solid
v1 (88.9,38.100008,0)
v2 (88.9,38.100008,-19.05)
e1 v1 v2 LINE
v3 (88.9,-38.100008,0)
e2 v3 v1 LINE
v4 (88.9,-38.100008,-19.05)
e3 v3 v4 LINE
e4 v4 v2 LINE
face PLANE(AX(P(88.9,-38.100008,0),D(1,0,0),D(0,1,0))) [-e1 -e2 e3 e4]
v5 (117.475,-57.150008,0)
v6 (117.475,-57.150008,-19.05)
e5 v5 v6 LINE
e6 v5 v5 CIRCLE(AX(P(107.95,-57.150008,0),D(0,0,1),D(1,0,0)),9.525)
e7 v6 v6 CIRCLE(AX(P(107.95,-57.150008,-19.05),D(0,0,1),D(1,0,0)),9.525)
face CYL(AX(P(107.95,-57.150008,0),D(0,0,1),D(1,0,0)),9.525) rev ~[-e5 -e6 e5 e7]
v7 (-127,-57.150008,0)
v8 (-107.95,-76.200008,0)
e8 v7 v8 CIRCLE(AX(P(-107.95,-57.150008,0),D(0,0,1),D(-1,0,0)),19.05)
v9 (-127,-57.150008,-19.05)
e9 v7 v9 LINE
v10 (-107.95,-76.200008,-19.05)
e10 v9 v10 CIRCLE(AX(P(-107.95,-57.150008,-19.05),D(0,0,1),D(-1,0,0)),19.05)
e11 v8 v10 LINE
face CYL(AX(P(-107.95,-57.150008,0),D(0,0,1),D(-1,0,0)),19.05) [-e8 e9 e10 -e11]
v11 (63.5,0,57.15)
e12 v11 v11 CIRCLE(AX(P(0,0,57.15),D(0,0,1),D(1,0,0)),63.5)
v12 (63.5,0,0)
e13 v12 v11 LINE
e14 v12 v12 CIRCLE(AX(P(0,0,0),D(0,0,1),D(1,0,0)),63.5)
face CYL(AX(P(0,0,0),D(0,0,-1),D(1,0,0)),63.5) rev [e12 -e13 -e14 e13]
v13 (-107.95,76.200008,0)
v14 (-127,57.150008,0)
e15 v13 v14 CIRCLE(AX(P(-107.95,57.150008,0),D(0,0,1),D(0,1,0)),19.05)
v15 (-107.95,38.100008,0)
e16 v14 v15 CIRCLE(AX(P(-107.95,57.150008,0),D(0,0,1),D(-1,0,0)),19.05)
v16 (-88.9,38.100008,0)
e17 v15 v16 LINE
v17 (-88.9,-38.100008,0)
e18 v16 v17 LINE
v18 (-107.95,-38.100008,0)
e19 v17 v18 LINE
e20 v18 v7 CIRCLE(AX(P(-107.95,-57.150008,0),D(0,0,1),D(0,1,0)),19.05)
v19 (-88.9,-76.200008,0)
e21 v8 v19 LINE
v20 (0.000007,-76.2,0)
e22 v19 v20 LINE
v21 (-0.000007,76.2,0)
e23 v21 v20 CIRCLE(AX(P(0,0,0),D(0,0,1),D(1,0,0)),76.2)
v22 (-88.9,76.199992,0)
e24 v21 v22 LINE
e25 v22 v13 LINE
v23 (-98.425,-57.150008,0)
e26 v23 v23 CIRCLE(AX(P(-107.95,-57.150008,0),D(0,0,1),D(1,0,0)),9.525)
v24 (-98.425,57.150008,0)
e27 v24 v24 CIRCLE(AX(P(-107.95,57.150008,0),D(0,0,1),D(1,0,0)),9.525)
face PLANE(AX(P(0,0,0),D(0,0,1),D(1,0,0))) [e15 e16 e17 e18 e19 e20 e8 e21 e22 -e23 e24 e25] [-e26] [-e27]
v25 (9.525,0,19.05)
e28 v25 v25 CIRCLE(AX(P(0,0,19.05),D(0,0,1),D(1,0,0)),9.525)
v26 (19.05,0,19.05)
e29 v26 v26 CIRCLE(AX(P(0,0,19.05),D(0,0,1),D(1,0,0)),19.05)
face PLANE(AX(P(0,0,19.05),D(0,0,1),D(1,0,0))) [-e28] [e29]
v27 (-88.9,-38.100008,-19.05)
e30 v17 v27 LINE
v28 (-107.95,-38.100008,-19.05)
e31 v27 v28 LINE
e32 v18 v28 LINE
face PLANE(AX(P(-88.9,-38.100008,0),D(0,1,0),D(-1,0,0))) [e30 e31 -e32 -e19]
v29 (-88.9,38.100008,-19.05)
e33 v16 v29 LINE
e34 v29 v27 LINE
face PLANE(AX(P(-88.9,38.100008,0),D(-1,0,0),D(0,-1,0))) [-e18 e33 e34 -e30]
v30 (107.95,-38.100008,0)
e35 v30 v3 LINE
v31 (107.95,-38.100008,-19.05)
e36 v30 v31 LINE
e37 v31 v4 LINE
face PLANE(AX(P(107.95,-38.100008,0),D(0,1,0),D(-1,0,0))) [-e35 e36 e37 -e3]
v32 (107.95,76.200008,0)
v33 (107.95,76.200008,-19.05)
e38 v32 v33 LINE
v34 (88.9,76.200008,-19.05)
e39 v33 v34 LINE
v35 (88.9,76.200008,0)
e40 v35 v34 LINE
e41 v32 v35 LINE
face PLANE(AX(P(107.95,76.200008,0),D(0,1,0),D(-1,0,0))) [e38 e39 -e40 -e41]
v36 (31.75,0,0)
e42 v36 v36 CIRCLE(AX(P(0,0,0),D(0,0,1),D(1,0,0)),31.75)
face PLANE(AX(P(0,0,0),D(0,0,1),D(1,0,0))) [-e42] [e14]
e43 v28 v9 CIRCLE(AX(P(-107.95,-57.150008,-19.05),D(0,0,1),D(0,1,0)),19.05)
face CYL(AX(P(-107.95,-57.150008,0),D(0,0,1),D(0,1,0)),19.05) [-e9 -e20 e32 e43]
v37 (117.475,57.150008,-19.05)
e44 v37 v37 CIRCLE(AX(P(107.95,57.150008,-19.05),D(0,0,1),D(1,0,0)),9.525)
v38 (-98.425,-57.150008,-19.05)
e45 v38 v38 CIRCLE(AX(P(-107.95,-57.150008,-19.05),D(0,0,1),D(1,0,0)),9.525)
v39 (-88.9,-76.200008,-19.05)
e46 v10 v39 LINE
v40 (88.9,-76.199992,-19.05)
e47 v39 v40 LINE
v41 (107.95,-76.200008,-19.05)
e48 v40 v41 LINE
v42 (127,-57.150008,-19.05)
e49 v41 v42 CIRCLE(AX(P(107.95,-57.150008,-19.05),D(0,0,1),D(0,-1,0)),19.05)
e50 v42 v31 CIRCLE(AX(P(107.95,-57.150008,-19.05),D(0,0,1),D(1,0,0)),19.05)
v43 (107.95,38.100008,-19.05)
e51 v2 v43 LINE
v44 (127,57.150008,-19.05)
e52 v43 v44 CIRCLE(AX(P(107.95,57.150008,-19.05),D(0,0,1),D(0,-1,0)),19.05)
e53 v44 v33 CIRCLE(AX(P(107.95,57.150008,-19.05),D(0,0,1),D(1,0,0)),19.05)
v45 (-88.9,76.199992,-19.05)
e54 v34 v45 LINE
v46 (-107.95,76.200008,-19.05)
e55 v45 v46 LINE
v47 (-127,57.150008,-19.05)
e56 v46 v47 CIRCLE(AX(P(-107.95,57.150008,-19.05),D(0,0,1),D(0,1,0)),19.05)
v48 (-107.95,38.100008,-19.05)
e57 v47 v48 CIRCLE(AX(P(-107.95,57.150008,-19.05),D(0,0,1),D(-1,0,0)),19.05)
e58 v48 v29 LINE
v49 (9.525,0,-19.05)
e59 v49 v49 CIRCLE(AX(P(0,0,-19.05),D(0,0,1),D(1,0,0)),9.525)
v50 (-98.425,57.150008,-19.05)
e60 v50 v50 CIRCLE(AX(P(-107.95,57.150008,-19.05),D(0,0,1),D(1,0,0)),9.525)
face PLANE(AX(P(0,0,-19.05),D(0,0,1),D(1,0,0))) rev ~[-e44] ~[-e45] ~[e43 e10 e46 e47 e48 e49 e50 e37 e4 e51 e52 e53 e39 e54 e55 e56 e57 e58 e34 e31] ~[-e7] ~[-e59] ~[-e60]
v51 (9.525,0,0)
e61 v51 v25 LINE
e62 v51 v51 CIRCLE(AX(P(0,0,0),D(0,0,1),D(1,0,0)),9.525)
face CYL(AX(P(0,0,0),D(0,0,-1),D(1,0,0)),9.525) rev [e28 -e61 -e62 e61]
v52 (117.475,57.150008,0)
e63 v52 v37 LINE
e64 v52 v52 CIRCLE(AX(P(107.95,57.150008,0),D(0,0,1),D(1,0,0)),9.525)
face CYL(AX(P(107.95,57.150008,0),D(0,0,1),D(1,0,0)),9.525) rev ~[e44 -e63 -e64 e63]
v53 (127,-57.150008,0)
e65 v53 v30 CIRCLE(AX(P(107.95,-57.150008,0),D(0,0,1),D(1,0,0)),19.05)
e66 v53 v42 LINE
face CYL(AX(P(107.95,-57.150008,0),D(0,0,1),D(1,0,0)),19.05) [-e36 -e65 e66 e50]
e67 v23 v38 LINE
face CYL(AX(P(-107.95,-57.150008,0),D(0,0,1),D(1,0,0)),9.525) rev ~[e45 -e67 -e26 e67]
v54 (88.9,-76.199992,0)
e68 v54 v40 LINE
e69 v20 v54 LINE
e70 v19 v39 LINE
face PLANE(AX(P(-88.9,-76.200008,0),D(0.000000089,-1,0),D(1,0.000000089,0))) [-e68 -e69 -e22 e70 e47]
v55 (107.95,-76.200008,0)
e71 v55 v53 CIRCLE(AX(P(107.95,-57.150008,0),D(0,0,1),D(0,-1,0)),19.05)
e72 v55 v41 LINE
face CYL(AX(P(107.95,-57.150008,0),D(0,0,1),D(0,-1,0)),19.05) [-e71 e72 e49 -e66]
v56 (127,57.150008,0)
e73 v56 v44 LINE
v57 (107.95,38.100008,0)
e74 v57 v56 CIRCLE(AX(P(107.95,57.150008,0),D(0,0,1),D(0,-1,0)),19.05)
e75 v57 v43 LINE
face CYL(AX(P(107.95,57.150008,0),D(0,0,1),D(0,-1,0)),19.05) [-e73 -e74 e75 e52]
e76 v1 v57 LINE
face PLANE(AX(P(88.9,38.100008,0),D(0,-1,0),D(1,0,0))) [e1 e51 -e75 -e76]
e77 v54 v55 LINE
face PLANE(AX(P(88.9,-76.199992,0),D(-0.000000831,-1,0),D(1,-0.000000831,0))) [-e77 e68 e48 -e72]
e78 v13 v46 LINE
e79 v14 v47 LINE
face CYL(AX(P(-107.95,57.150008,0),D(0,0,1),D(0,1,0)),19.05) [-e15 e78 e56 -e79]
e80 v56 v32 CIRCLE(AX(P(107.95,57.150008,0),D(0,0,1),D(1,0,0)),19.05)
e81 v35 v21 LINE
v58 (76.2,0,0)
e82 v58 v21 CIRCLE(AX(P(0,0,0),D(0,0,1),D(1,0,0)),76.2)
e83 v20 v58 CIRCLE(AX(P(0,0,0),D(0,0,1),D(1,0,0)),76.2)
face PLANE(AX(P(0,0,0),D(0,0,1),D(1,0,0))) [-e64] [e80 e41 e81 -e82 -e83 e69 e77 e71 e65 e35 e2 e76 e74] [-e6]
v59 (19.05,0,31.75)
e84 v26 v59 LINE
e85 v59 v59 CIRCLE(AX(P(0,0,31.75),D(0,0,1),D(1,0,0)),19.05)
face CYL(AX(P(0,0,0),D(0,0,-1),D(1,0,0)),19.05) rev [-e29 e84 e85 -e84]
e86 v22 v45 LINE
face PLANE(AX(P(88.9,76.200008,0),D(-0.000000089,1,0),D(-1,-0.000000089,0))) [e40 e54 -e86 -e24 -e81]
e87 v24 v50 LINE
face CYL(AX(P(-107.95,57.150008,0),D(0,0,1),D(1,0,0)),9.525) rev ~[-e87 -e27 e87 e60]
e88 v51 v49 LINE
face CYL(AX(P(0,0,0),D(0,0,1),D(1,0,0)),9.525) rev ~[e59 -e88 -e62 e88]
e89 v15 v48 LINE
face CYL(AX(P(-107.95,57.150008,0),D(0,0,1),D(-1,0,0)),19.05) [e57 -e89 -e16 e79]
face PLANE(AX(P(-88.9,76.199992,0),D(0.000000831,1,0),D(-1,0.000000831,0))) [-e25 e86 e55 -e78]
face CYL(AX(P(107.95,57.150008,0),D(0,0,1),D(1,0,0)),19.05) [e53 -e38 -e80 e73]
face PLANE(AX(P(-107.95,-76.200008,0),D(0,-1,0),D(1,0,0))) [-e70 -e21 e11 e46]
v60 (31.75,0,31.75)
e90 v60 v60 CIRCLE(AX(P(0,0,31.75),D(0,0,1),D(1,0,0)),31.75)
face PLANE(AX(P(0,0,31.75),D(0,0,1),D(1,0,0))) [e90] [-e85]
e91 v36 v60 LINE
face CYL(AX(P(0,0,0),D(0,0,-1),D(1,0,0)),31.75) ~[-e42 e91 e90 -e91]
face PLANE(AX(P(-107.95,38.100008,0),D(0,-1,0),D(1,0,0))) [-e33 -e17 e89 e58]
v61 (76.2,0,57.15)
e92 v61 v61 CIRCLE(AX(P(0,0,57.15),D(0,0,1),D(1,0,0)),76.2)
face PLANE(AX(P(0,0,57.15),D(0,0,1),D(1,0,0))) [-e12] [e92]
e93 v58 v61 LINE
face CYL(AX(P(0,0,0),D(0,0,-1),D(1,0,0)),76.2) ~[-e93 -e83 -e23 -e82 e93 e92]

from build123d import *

# Parameters (mm, degrees)
F0_R     = 63.5
F0_R_2   = 9.525
F0_R_3   = 31.75
F0_R_4   = 19.05
F1_DEPTH = 19.05
F2_DEPTH = 57.15
F3_DEPTH = 31.75
F4_DEPTH = 19.05
F5_DEPTH = 25.4


# Not quite as in the source:
# - ends of sketch curves that miss each other by under 0.0002 mm in the source are joined


with BuildPart() as f1:
    # F0 (on Top) → F1 (new body)
    with BuildSketch(Plane.XY):
        with BuildLine():
            ThreePointArc((2.2517e-06, -76.2), (53.8815375225, -53.8815359303), (76.2, 0))
            ThreePointArc((76.2, 0), (53.8815360903, 53.8815373625), (-1.7992e-06, 76.2))
            ThreePointArc((-1.7992e-06, 76.2), (-76.2, -2.0255e-06), (2.2517e-06, -76.2))
        make_face()
        Circle(F0_R, mode=Mode.SUBTRACT)
        with BuildLine():
            ThreePointArc((-1.7992e-06, 76.2), (53.8815360903, 53.8815373625), (76.2, 0))
            ThreePointArc((76.2, 0), (53.8815375225, -53.8815359303), (2.2517e-06, -76.2))
            Line((2.2517e-06, -76.2), (88.9, -76.199992084))
            Line((88.9, -76.199992084), (88.9, -38.100007916))
            Line((88.9, -38.100007916), (88.9, 38.100007916))
            Line((88.9, 38.100007916), (88.9, 76.200007916))
            Line((88.9, 76.200007916), (-1.7992e-06, 76.2))
        make_face()
        with BuildLine():
            ThreePointArc((2.2517e-06, -76.2), (-76.2, -2.0255e-06), (-1.7992e-06, 76.2))
            Line((-1.7992e-06, 76.2), (-88.9, 76.199992084))
            Line((-88.9, 76.199992084), (-88.9, 38.100007916))
            Line((-88.9, 38.100007916), (-88.9, -38.100007916))
            Line((-88.9, -38.100007916), (-88.9, -76.200007916))
            Line((-88.9, -76.200007916), (2.2517e-06, -76.2))
        make_face()
        with BuildLine():
            Line((-88.9, 38.100007916), (-88.9, 76.199992084))
            Line((-88.9, 76.199992084), (-107.95, 76.200007916))
            ThreePointArc((-107.95, 76.200007916), (-121.4203841816, 70.6203920976), (-127, 57.150007916))
            ThreePointArc((-127, 57.150007916), (-121.4203841816, 43.6796237344), (-107.95, 38.100007916))
            Line((-107.95, 38.100007916), (-88.9, 38.100007916))
        make_face()
        with Locations((-107.95, 57.150007916)):
            Circle(F0_R_2, mode=Mode.SUBTRACT)
        with BuildLine():
            Line((107.95, 76.200007916), (88.9, 76.200007916))
            Line((88.9, 76.200007916), (88.9, 38.100007916))
            Line((88.9, 38.100007916), (107.95, 38.100007916))
            ThreePointArc((107.95, 38.100007916), (121.4203841816, 43.6796237344), (127, 57.150007916))
            ThreePointArc((127, 57.150007916), (121.4203841816, 70.6203920976), (107.95, 76.200007916))
        make_face()
        with Locations((107.95, 57.150007916)):
            Circle(F0_R_2, mode=Mode.SUBTRACT)
        with BuildLine():
            Line((88.9, -38.100007916), (88.9, -76.199992084))
            Line((88.9, -76.199992084), (107.95, -76.200007916))
            ThreePointArc((107.95, -76.200007916), (121.4203841816, -70.6203920976), (127, -57.150007916))
            ThreePointArc((127, -57.150007916), (121.4203841816, -43.6796237344), (107.95, -38.100007916))
            Line((107.95, -38.100007916), (88.9, -38.100007916))
        make_face()
        with Locations((107.95, -57.150007916)):
            Circle(F0_R_2, mode=Mode.SUBTRACT)
        with BuildLine():
            Line((-107.95, -76.200007916), (-88.9, -76.200007916))
            Line((-88.9, -76.200007916), (-88.9, -38.100007916))
            Line((-88.9, -38.100007916), (-107.95, -38.100007916))
            ThreePointArc((-107.95, -38.100007916), (-121.4203841816, -43.6796237344), (-127, -57.150007916))
            ThreePointArc((-127, -57.150007916), (-121.4203841816, -70.6203920976), (-107.95, -76.200007916))
        make_face()
        with Locations((-107.95, -57.150007916)):
            Circle(F0_R_2, mode=Mode.SUBTRACT)
        Circle(F0_R)
        Circle(F0_R_3, mode=Mode.SUBTRACT)
        Circle(F0_R_3)
        Circle(F0_R_4, mode=Mode.SUBTRACT)
        Circle(F0_R_4)
        Circle(F0_R_2, mode=Mode.SUBTRACT)
        Circle(F0_R_2)
    extrude(amount=-F1_DEPTH)

    # F0 (on Top) → F2 (join)
    with BuildSketch(Plane.XY):
        with BuildLine():
            ThreePointArc((2.2517e-06, -76.2), (53.8815375225, -53.8815359303), (76.2, 0))
            ThreePointArc((76.2, 0), (53.8815360903, 53.8815373625), (-1.7992e-06, 76.2))
            ThreePointArc((-1.7992e-06, 76.2), (-76.2, -2.0255e-06), (2.2517e-06, -76.2))
        make_face()
        Circle(F0_R, mode=Mode.SUBTRACT)
    extrude(amount=F2_DEPTH)

    # F0 (on Top) → F3 (join)
    with BuildSketch(Plane.XY):
        Circle(F0_R_3)
        Circle(F0_R_4, mode=Mode.SUBTRACT)
    extrude(amount=F3_DEPTH)

    # F0 (on Top) → F4 (join)
    with BuildSketch(Plane.XY):
        Circle(F0_R_4)
        Circle(F0_R_2, mode=Mode.SUBTRACT)
    extrude(amount=F4_DEPTH)

    # F0 (on Top) → F5 (cut)
    with BuildSketch(Plane.XY):
        Circle(F0_R_2)
    extrude(amount=-F5_DEPTH, mode=Mode.SUBTRACT)


solid = f1.part
